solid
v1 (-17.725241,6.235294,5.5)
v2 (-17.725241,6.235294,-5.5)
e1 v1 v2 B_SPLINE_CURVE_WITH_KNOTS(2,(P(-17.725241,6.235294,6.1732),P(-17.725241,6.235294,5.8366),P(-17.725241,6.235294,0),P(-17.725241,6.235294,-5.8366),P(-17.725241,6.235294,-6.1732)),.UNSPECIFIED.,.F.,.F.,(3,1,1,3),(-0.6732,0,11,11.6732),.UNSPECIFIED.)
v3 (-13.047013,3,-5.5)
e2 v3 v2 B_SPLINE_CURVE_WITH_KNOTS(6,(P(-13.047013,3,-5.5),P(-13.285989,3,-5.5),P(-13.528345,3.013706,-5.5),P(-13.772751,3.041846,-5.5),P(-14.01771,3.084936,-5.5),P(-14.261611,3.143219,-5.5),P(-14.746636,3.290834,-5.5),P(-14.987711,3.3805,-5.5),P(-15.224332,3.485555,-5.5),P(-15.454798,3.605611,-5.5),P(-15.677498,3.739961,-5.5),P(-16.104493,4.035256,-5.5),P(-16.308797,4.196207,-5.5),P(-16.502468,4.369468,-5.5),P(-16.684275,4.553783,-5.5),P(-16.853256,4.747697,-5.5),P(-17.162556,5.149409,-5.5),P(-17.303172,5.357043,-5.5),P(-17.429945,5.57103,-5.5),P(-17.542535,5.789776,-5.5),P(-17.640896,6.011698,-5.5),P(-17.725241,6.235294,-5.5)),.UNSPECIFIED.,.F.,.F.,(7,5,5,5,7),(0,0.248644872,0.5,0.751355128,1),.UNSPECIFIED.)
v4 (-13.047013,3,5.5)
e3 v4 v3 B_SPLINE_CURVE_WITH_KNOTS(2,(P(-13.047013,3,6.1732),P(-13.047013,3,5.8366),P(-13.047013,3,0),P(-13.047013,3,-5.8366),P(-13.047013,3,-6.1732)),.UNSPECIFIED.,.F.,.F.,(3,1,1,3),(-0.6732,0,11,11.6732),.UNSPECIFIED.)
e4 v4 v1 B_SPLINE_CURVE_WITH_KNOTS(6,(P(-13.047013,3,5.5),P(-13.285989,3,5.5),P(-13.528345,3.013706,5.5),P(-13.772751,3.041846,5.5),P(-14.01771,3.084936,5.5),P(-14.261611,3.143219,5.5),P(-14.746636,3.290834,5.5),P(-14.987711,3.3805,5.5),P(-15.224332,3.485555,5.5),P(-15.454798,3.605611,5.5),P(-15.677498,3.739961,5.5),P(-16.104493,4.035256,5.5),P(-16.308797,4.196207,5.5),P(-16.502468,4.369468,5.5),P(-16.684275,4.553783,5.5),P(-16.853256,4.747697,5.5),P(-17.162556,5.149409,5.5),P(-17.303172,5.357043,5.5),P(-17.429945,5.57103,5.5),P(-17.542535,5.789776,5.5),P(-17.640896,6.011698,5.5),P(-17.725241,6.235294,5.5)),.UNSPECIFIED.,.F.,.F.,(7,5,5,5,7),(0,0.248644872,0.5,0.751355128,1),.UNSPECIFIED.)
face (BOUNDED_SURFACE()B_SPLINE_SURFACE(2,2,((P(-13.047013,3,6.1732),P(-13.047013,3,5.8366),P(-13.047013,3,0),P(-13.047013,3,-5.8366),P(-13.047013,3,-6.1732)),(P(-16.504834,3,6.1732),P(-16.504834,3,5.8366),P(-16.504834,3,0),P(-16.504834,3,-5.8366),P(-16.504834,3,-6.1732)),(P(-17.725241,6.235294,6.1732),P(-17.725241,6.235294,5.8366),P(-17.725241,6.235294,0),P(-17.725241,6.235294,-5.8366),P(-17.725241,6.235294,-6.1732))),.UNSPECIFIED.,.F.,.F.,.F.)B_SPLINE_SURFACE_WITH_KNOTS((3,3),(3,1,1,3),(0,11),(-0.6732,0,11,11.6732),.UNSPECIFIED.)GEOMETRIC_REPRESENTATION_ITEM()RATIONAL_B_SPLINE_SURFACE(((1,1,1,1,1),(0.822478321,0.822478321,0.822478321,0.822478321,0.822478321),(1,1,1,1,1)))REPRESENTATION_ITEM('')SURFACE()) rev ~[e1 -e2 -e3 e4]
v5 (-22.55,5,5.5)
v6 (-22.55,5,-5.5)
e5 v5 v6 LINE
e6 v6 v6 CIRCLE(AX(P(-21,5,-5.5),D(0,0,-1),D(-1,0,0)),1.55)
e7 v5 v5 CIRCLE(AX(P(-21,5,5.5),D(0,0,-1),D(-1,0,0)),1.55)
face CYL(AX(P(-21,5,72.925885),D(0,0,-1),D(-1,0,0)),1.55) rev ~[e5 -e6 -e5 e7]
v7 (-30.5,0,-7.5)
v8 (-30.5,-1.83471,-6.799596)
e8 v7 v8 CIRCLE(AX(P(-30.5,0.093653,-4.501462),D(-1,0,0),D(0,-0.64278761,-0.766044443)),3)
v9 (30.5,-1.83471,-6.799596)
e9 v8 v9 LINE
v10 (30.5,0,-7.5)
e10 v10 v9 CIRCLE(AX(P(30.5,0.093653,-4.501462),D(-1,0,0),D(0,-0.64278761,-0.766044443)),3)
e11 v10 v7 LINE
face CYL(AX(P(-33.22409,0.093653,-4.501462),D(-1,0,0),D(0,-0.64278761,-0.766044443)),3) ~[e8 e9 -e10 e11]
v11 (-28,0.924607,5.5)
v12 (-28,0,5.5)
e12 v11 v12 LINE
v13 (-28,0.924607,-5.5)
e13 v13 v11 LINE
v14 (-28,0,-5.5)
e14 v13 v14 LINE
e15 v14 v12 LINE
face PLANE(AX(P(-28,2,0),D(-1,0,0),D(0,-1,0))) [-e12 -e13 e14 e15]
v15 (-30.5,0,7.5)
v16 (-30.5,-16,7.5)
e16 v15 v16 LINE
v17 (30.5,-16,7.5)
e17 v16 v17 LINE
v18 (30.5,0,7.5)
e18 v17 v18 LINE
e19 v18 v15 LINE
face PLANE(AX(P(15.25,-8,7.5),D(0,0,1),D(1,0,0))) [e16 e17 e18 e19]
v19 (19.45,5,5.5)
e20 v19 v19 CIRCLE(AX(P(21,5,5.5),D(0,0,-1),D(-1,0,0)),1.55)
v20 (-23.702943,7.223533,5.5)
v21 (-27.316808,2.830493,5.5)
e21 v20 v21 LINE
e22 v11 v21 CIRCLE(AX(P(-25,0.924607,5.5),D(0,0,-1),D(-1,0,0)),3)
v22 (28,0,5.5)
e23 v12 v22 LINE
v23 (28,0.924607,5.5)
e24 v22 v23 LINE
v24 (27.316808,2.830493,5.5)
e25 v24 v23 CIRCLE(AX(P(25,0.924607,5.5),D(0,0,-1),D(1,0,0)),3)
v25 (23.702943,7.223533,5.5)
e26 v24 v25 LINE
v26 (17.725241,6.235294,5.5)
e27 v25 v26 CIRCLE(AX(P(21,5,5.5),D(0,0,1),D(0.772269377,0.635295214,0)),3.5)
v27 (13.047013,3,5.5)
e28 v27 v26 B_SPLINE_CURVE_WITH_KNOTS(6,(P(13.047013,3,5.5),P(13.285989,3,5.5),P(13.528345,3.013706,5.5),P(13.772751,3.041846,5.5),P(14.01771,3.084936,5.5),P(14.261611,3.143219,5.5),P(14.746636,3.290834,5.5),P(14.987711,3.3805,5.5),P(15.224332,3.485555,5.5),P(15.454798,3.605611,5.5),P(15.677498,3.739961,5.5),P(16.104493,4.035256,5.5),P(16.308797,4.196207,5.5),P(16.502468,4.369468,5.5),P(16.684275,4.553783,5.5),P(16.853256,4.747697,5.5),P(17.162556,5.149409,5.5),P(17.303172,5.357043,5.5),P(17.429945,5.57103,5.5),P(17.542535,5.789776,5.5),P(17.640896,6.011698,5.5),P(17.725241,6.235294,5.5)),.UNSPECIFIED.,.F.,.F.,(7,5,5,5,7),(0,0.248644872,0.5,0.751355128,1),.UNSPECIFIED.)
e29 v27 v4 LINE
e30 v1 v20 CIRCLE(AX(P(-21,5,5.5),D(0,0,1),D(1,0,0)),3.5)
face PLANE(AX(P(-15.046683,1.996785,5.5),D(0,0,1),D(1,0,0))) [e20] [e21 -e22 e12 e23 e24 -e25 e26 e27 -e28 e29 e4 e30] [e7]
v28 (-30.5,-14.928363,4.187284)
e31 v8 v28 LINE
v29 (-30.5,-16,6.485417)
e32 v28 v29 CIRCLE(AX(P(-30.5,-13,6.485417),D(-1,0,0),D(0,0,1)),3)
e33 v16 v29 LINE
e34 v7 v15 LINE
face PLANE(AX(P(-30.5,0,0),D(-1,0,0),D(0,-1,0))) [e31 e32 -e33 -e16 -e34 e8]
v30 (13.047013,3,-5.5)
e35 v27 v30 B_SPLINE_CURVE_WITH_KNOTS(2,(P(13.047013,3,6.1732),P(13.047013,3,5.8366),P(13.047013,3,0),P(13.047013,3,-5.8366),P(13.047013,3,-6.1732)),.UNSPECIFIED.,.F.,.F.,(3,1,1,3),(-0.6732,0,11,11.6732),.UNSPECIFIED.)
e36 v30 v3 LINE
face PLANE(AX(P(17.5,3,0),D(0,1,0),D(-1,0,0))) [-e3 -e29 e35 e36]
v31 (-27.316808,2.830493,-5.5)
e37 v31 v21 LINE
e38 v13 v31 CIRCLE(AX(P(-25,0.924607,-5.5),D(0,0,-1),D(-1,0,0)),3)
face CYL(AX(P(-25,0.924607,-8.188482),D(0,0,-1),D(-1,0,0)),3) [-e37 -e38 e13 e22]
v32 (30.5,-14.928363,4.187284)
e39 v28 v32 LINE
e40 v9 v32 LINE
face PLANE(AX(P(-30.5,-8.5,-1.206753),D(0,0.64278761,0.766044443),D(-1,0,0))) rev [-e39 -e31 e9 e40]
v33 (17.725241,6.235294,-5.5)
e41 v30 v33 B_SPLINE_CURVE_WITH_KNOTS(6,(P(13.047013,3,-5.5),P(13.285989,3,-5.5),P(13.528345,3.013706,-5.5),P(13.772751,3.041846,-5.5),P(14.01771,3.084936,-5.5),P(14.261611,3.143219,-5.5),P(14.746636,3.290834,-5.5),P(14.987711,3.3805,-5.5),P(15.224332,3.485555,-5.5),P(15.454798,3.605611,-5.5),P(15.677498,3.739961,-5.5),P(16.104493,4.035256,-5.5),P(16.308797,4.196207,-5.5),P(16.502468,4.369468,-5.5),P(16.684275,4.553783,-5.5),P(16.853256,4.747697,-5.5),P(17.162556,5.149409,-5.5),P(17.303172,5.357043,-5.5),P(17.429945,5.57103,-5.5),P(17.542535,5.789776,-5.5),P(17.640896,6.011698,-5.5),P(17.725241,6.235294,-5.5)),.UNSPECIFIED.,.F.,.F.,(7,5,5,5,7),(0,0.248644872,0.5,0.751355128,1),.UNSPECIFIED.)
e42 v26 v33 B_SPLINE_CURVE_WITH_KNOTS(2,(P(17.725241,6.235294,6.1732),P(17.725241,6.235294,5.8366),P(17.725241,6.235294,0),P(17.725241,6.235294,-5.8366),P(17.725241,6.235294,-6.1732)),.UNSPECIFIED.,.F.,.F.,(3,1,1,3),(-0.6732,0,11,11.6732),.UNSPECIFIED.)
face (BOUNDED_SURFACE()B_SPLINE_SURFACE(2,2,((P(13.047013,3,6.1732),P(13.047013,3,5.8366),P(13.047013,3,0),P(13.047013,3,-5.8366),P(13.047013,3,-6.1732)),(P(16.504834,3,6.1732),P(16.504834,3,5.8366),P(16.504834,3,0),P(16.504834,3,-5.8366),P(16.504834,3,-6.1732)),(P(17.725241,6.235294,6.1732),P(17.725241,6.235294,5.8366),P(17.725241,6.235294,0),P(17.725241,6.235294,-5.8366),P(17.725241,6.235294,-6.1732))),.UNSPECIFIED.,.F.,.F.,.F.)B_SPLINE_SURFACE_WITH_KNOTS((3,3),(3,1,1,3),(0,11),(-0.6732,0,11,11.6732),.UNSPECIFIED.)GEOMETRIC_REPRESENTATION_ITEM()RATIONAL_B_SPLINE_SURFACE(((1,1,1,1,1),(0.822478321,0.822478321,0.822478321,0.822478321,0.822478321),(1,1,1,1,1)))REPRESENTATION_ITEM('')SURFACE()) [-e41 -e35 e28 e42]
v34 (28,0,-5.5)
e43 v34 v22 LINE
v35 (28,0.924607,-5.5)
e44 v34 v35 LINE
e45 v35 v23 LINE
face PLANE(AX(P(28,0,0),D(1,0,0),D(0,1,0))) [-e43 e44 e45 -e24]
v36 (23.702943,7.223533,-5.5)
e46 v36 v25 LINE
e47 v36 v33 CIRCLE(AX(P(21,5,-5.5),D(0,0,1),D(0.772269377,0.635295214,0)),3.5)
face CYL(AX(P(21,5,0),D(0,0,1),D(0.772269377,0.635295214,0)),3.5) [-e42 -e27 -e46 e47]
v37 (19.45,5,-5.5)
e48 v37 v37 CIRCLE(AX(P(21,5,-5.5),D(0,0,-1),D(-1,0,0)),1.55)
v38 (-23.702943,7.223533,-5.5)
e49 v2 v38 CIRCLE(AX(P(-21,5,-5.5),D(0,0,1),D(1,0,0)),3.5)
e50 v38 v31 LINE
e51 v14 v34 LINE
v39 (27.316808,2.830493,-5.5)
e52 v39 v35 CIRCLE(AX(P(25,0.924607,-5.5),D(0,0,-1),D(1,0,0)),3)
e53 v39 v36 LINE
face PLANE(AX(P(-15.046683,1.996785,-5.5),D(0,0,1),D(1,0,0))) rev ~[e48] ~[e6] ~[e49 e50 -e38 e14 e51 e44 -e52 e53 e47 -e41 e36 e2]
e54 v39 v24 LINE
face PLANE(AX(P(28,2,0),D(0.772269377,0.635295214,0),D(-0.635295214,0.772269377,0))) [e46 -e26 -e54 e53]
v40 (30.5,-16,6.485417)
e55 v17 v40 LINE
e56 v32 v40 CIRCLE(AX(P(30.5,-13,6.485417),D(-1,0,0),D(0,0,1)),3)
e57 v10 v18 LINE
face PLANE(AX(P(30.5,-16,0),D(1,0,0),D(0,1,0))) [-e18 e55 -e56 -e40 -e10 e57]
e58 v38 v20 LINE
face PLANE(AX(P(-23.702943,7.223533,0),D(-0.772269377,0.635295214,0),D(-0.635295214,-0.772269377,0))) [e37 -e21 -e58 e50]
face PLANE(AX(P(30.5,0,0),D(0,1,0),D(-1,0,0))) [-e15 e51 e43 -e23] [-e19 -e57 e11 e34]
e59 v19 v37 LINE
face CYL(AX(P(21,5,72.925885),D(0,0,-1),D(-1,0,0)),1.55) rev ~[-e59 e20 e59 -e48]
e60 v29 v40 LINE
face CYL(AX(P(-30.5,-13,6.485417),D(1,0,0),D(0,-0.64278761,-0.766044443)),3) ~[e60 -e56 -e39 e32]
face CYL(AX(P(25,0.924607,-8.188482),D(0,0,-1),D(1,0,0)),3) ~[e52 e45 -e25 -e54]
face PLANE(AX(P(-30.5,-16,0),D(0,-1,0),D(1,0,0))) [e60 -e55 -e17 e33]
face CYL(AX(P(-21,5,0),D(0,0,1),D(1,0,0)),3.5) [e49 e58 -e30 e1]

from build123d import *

# Parameters (mm, degrees)
F1_DEPTH    = 7.5
F2_DEPTH    = 5.5
F3_SIZE2    = 12.5864944677
F3_SIZE     = 15
F5_D        = 3.1
F6_R        = 3
F7_T1_DEPTH = 66.4481797844
F7_T3_DEPTH = 16.376963756
F8_R        = 5


# Not quite as in the source:
# - a fillet or chamfer that OpenCascade refuses, or shapes differently, is made with other operations: its cross-section is extruded or revolved along the edge and cut away or added


with BuildPart() as f1:
    # F0 (on Top) → F1 (new body, symmetric)
    with BuildSketch(Plane.XY):
        Polygon((28, 0), (0, 0), (0, -16), (30.5, -16), (30.5, 0), align=None)
        Polygon((0, 0), (-28, 0), (-30.5, 0), (-30.5, -16), (0, -16), align=None)
    extrude(amount=F1_DEPTH, both=True)

    # F0 (on Top) → F2 (join, symmetric)
    with BuildSketch(Plane.XY):
        with BuildLine():
            Line((-17.5, 3), (-17.5, 5))
            ThreePointArc((-17.5, 5), (-22.1810377062, 1.7052845439), (-23.7029428208, 7.2235332486))
            Line((-23.7029428208, 7.2235332486), (-28, 2))
            Line((-28, 2), (-28, 0))
            Line((-28, 0), (0, 0))
            Line((0, 0), (0, 3))
            Line((0, 3), (-17.5, 3))
        make_face()
        with BuildLine():
            ThreePointArc((-23.7029428208, 7.2235332486), (-22.1810377062, 1.7052845439), (-17.5, 5))
            ThreePointArc((-17.5, 5), (-19.8189622938, 8.2947154561), (-23.7029428208, 7.2235332486))
        make_face()
        with BuildLine():
            ThreePointArc((23.7029428208, 7.2235332486), (19.8189622938, 8.2947154561), (17.5, 5))
            ThreePointArc((17.5, 5), (21, 1.5), (24.5, 5))
            ThreePointArc((24.5, 5), (24.2947154561, 6.1810377062), (23.7029428208, 7.2235332486))
        make_face()
        with BuildLine():
            Line((17.5, 3), (0, 3))
            Line((0, 3), (0, 0))
            Line((0, 0), (28, 0))
            Line((28, 0), (28, 2))
            Line((28, 2), (23.7029428208, 7.2235332486))
            ThreePointArc((23.7029428208, 7.2235332486), (24.2947154561, 6.1810377062), (24.5, 5))
            ThreePointArc((24.5, 5), (21, 1.5), (17.5, 5))
            Line((17.5, 5), (17.5, 3))
        make_face()
    extrude(amount=F2_DEPTH, both=True)

    # F3
    f3_edges = [f1.edges().sort_by_distance(p)[0] for p in [
        (0, -16, -7.5),
    ]]
    f3_side = f1.faces().sort_by_distance((0, -8, -7.5))[0]
    chamfer(f3_edges, length=F3_SIZE, length2=F3_SIZE2, reference=f3_side)

    # F5 (through all)
    with Locations(Plane.XY.offset(5.5)):
        with Locations((-21, 5), (21, 5)):
            Hole(F5_D / 2)

    # F6
    f6_edges = [f1.edges().sort_by_distance(p)[0] for p in [
        (0, -16, 5.086494),
    ]]
    fillet(f6_edges, radius=F6_R)

    # F7: fillet of radius 3 on 3 edges, made by hand

    # F7_s2 → F7_t1 (cut)
    with BuildSketch(Plane.YZ.offset(-33.2240898922)):
        with BuildLine():
            ThreePointArc((-1.8347095698, -6.7995955078), (-0.9762901404, -7.3041789179), (0, -7.5))
            Line((0, -7.5), (-1, -7.5))
            Line((-1, -7.5), (-1.8347095698, -6.7995955078))
        make_face()
    extrude(amount=F7_T1_DEPTH, mode=Mode.SUBTRACT)

    # F7_s4 → F7_t3 (cut)
    with BuildSketch(Plane.XY.offset(-8.188481878)):
        with BuildLine():
            ThreePointArc((-28, 0.9246072488), (-27.8240418195, 1.9369252827), (-27.3168081321, 2.8304928904))
            Line((-27.3168081321, 2.8304928904), (-28, 2))
            Line((-28, 2), (-28, 0.9246072488))
        make_face()
        with BuildLine():
            ThreePointArc((28, 0.9246072488), (27.8240418195, 1.9369252827), (27.3168081321, 2.8304928904))
            Line((27.3168081321, 2.8304928904), (28, 2))
            Line((28, 2), (28, 0.9246072488))
        make_face()
    extrude(amount=F7_T3_DEPTH, mode=Mode.SUBTRACT)

    # F8
    f8_edges = [f1.edges().sort_by_distance(p)[0] for p in [
        (17.5, 3, 0),
        (-17.5, 3, 0),
    ]]
    fillet(f8_edges, radius=F8_R)


solid = f1.part
